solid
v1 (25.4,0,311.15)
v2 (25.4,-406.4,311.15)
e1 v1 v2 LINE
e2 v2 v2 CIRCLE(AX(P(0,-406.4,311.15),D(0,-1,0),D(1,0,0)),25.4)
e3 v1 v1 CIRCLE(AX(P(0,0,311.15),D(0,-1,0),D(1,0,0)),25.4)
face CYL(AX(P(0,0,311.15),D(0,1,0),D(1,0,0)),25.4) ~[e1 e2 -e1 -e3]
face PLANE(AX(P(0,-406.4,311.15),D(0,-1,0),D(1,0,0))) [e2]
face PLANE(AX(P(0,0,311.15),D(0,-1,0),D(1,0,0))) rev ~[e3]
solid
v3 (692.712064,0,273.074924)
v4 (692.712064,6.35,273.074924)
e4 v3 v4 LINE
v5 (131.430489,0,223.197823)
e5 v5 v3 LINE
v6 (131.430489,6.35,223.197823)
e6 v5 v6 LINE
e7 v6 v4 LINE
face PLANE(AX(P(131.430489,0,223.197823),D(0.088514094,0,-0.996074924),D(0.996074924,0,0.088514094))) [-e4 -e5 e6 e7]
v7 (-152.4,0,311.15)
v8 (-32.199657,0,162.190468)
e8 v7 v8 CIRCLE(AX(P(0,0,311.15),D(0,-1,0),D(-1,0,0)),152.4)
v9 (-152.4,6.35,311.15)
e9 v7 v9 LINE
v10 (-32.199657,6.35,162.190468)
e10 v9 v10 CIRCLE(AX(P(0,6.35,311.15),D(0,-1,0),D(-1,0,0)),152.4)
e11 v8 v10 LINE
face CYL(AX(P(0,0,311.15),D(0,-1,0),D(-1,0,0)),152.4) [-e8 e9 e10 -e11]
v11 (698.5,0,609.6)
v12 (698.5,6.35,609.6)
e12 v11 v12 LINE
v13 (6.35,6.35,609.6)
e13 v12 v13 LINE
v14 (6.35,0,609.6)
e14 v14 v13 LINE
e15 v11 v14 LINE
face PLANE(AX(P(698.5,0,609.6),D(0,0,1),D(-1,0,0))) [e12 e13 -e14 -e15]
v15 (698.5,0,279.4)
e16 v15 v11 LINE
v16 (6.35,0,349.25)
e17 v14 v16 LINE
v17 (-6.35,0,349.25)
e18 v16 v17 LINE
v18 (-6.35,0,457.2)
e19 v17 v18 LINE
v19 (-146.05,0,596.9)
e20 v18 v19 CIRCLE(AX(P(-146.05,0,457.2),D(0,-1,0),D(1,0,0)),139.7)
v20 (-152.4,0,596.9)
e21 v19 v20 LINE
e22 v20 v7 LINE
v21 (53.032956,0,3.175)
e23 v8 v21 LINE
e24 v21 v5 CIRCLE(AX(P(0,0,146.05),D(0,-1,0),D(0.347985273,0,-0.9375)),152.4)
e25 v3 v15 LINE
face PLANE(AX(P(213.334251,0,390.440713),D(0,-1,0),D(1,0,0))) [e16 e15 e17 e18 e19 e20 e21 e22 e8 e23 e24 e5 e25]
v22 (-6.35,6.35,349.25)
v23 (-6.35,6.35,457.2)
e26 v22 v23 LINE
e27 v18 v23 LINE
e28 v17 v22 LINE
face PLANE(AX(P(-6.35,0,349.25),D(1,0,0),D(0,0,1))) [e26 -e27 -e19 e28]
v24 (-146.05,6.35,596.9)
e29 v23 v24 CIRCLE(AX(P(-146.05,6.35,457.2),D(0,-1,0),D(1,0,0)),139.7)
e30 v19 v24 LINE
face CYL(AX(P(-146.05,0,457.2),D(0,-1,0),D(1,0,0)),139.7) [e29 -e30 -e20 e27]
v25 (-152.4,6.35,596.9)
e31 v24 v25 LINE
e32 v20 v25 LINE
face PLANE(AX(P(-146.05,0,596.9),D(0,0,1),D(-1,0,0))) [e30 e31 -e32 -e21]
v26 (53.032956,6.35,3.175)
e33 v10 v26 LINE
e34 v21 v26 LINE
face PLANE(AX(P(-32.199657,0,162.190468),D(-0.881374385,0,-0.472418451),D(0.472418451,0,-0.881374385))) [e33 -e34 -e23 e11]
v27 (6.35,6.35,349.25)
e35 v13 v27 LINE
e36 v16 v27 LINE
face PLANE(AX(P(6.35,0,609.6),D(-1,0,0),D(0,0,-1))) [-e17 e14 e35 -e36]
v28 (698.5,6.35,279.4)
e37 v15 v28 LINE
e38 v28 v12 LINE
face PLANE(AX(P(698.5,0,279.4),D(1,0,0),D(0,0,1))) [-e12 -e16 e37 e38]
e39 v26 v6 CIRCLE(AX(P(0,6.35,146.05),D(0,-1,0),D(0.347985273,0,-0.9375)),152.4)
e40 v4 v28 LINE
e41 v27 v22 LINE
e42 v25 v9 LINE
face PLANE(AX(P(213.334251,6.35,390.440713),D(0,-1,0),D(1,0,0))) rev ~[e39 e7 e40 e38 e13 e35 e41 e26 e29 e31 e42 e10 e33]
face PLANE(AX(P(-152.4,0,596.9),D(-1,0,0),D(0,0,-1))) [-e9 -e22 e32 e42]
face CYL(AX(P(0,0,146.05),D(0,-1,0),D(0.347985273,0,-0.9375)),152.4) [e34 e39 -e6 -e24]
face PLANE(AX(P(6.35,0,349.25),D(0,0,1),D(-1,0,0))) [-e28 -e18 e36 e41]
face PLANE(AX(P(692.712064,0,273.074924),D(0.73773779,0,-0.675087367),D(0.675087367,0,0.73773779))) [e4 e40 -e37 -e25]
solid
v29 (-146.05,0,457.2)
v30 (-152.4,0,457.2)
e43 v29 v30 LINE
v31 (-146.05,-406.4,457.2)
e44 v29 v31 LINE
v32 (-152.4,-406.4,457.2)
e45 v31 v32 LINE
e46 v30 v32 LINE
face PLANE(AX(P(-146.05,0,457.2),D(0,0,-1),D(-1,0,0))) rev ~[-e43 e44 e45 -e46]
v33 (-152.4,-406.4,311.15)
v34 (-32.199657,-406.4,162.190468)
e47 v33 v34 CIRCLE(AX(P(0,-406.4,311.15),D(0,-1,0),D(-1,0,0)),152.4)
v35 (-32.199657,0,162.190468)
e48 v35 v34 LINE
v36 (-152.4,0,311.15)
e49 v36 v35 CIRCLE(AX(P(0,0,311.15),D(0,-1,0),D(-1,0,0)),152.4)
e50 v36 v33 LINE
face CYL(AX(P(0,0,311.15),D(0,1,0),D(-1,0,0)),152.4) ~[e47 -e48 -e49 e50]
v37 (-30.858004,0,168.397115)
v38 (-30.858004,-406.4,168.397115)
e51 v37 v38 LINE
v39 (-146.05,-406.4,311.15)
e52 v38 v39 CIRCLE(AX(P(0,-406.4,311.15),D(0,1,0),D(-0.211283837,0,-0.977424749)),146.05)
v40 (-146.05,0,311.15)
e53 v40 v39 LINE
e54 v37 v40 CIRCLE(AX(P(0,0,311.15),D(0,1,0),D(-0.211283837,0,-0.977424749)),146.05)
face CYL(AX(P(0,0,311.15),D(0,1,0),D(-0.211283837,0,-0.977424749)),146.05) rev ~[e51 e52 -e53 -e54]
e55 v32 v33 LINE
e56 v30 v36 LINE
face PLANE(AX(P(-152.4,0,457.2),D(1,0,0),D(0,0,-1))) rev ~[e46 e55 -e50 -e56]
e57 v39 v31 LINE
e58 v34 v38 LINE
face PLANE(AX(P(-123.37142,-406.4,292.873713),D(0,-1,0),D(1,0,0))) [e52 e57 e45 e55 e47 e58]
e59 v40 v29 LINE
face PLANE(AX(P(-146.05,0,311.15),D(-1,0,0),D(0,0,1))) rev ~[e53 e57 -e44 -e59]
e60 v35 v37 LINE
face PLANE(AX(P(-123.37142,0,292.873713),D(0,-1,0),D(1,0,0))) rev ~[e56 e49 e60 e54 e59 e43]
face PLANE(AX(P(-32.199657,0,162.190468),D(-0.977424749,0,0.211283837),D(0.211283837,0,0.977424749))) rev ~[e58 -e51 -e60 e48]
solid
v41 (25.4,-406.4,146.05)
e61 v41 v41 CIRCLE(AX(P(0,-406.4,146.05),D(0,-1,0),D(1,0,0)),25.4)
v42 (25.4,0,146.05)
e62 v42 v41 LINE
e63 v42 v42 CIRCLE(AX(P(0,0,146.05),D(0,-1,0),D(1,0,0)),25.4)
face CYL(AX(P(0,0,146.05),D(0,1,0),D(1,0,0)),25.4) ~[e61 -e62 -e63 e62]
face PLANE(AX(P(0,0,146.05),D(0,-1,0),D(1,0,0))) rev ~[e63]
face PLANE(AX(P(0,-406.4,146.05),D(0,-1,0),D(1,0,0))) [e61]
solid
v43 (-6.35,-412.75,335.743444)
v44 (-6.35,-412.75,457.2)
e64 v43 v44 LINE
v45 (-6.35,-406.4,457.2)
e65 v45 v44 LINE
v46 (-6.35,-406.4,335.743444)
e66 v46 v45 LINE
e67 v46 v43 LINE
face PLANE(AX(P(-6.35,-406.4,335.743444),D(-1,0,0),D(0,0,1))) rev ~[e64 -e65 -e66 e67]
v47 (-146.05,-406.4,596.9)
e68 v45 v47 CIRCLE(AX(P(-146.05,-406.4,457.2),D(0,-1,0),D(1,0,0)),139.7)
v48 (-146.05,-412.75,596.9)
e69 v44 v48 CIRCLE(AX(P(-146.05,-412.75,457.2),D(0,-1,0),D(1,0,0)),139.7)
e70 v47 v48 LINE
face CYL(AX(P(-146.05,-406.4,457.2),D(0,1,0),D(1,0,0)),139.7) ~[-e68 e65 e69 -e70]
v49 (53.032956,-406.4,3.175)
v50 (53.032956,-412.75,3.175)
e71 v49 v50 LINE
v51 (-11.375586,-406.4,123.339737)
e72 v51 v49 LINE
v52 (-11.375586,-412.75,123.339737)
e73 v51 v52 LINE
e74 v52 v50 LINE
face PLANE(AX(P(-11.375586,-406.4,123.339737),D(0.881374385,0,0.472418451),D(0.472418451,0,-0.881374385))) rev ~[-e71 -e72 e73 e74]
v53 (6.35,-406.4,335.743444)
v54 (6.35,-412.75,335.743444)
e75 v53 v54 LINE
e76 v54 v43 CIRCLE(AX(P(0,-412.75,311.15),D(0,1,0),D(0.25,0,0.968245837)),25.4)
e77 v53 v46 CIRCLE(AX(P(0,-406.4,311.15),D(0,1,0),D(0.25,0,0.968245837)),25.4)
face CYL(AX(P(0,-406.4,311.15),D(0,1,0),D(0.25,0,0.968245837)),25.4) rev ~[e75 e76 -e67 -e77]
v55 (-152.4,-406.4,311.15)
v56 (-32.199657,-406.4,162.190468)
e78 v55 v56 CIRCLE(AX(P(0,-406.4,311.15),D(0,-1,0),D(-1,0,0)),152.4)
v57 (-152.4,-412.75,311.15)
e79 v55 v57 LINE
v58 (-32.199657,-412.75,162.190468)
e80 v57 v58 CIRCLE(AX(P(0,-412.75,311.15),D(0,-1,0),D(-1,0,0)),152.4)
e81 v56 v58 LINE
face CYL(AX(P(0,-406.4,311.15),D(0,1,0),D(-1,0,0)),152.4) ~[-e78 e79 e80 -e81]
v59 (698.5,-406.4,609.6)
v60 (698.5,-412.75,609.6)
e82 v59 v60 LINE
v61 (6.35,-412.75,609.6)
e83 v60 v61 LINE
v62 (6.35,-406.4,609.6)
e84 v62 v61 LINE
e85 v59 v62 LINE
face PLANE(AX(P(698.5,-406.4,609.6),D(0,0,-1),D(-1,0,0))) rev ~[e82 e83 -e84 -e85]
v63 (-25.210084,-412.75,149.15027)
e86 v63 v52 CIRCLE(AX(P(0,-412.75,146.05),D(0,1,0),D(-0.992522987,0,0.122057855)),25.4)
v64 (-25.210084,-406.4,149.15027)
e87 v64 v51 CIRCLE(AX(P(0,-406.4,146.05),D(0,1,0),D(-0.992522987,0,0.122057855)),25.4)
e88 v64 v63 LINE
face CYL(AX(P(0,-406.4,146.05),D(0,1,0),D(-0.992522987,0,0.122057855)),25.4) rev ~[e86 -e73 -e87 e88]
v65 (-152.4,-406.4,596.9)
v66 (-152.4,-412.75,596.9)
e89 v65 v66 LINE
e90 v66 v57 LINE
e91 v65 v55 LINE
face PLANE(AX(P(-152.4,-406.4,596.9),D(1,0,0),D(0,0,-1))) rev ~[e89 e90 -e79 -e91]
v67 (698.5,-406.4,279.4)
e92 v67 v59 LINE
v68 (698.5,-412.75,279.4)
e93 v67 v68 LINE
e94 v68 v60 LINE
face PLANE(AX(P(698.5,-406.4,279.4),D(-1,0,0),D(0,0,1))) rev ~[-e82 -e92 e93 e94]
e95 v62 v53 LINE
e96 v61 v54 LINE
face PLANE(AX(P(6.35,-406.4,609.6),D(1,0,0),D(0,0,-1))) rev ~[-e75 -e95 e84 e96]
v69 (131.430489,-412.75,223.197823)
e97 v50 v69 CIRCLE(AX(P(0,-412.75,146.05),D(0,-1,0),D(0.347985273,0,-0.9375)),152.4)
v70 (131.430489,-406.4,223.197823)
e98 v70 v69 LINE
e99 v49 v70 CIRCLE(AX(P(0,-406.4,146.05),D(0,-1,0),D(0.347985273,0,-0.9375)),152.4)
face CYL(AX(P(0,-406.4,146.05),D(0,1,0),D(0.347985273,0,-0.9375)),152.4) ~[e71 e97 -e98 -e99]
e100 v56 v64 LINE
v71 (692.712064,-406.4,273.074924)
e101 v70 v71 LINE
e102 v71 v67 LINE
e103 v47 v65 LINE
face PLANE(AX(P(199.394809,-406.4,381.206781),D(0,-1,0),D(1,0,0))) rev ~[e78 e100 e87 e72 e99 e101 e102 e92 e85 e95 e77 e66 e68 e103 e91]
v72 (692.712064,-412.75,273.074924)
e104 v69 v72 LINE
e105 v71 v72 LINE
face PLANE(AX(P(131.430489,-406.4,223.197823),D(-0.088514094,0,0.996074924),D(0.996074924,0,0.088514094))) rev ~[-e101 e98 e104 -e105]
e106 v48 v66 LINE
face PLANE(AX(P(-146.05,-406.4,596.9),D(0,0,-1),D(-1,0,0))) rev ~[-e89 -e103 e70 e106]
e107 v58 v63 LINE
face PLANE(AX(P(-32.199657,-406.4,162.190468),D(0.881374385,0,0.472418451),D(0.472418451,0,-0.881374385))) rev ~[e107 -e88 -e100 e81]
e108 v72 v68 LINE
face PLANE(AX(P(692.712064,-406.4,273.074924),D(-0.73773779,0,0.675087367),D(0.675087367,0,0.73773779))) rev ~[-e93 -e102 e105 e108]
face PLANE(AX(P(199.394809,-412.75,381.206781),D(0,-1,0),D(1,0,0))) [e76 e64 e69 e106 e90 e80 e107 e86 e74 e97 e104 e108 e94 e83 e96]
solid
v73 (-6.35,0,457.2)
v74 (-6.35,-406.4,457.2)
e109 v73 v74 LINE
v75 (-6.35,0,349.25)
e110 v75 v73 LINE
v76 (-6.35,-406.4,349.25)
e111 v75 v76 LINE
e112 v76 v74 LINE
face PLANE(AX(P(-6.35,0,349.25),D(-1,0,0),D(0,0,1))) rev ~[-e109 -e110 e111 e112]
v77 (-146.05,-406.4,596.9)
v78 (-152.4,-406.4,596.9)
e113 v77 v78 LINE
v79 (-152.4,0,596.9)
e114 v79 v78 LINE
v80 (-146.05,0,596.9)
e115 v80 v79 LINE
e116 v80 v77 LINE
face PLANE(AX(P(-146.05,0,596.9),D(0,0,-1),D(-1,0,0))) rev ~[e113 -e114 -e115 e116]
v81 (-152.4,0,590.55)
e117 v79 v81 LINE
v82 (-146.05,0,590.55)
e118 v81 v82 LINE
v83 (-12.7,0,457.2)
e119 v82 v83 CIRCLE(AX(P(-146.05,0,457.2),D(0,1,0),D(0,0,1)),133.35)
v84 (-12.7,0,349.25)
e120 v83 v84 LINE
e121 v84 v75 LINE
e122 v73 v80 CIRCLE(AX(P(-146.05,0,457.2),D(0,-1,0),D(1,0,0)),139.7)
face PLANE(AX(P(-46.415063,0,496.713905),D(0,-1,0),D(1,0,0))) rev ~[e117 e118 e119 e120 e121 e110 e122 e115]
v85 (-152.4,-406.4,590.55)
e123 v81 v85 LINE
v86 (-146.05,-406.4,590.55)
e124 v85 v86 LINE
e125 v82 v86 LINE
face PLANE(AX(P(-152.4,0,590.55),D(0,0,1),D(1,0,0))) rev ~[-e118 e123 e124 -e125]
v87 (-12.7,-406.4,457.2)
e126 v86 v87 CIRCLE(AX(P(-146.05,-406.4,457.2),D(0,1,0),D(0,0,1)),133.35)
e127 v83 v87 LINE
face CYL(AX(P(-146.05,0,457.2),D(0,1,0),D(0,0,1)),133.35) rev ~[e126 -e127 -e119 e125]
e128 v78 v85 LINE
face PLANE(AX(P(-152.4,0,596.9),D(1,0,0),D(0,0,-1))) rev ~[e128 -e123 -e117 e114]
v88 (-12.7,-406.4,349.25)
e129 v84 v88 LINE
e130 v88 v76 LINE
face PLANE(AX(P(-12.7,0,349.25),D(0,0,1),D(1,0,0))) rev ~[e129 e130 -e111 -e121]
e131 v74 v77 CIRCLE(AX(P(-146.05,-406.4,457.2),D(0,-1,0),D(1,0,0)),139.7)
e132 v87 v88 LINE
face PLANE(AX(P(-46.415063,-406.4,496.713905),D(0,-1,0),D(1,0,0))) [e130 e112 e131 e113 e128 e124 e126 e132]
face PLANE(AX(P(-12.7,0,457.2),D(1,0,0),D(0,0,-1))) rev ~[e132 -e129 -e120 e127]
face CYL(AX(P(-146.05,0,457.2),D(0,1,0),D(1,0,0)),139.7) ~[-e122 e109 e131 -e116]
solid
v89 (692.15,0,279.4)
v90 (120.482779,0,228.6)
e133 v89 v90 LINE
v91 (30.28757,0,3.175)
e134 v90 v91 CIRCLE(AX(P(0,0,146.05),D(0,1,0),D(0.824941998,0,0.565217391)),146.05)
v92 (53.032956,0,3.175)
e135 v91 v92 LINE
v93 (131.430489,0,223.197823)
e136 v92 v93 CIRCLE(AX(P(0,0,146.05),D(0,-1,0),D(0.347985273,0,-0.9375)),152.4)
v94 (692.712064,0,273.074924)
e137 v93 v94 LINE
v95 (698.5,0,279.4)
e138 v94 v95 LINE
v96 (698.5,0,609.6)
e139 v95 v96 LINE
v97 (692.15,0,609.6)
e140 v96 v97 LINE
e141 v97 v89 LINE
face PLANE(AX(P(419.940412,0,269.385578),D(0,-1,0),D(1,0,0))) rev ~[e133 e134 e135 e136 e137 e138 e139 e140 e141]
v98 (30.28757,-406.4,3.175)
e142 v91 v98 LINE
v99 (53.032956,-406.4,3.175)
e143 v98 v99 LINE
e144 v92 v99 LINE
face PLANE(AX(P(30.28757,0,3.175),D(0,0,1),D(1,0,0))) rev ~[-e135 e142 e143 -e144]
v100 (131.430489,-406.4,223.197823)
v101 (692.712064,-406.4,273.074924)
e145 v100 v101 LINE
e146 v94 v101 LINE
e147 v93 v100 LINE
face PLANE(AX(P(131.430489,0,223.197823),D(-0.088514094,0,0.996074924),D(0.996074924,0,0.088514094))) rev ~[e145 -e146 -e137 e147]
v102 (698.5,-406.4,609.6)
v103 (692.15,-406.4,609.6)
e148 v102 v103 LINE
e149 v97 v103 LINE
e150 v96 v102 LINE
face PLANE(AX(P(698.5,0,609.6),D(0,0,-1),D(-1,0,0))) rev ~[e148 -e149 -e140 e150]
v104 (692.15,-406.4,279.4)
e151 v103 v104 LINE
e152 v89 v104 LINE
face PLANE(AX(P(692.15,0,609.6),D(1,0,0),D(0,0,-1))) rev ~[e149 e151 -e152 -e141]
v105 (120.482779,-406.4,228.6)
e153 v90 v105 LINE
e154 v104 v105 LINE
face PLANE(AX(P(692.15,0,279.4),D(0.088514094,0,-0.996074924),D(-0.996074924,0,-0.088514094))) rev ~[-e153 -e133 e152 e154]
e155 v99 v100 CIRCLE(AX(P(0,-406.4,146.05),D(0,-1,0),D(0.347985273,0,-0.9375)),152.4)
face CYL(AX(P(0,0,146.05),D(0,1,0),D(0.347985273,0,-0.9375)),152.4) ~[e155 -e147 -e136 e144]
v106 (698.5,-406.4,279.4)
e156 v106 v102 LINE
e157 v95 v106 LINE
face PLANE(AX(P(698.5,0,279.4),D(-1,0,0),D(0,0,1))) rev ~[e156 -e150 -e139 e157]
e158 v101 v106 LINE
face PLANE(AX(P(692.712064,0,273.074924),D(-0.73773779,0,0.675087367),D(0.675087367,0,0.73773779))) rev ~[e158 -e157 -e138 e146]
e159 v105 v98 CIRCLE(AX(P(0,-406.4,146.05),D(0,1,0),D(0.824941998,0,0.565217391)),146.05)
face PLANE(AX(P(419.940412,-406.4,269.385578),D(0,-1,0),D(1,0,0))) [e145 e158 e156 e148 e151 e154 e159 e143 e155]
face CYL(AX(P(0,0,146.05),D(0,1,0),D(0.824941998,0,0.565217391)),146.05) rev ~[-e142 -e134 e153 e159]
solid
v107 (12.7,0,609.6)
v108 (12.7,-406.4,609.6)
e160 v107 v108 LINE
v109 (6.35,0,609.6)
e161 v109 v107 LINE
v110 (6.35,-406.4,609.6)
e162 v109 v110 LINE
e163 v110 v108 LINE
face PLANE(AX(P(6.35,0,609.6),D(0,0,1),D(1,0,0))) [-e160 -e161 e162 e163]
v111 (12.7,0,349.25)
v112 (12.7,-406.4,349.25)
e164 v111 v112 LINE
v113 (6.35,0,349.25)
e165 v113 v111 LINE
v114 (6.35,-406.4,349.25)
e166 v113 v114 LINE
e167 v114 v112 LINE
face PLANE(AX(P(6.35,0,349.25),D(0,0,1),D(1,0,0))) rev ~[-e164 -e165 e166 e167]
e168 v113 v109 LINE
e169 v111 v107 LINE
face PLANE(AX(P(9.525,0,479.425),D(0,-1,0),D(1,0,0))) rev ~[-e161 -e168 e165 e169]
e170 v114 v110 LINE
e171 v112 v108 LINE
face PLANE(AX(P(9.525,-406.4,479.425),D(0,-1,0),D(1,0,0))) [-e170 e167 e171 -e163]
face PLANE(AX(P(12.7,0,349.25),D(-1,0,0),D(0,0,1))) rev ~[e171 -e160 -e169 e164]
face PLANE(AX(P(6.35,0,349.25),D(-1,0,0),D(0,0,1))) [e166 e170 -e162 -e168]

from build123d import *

# Parameters (mm, degrees)
F0_R     = 25.4
F1_DEPTH = 406.4
F0_W     = 6.35
F0_H     = 260.35
F3_DEPTH = 6.35
F5_DEPTH = 6.35


# Not quite as in the source:
# - a feature names something its author has since deleted; it is built from what else it names


with BuildPart() as f1:
    # F0 (on Front) → F1 (new body)
    with BuildSketch(Plane.XZ):
        with Locations((0, 146.05)):
            Circle(F0_R)
    extrude(amount=F1_DEPTH)


with BuildPart() as f1b:
    # F0 (on Front) → F1, piece 2 (new body)
    with BuildSketch(Plane.XZ):
        with BuildLine():
            Line((-32.1996567388, 162.1904682274), (-30.8580043747, 168.3971153846))
            ThreePointArc((-30.8580043747, 168.3971153846), (-113.6604901426, 219.4336138929), (-146.05, 311.15))
            Line((-146.05, 311.15), (-146.05, 457.2))
            Line((-146.05, 457.2), (-152.4, 457.2))
            Line((-152.4, 457.2), (-152.4, 311.15))
            ThreePointArc((-152.4, 311.15), (-118.6022505836, 215.4459449318), (-32.1996567388, 162.1904682274))
        make_face()
    extrude(amount=F1_DEPTH)


with BuildPart() as f1c:
    # F0 (on Front) → F1, piece 3 (new body)
    with BuildSketch(Plane.XZ):
        with Locations((0, 311.15)):
            Circle(F0_R)
    extrude(amount=F1_DEPTH)


with BuildPart() as f1d:
    # F0 (on Front) → F1, piece 4 (new body)
    with BuildSketch(Plane.XZ):
        with BuildLine():
            ThreePointArc((120.4827788524, 228.6), (135.5987911183, 91.7953195822), (30.287569645, 3.175))
            Line((30.287569645, 3.175), (53.032955556, 3.175))
            ThreePointArc((53.032955556, 3.175), (143.559051356, 94.8976904357), (131.430489055, 223.1978226963))
            Line((131.430489055, 223.1978226963), (692.7120644971, 273.0749242296))
            Line((692.7120644971, 273.0749242296), (698.5, 279.4))
            Line((698.5, 279.4), (698.5, 609.6))
            Line((698.5, 609.6), (692.15, 609.6))
            Line((692.15, 609.6), (692.15, 279.4))
            Line((692.15, 279.4), (120.4827788524, 228.6))
        make_face()
    extrude(amount=F1_DEPTH)


with BuildPart() as f1e:
    # F0 (on Front) → F1, piece 5 (new body)
    with BuildSketch(Plane.XZ):
        with Locations((9.525, 479.425)):
            Rectangle(F0_W, F0_H)
    extrude(amount=F1_DEPTH)


with BuildPart() as f1f:
    # F0 (on Front) → F1, piece 6 (new body)
    with BuildSketch(Plane.XZ):
        with BuildLine():
            Line((-12.7, 457.2), (-12.7, 349.25))
            Line((-12.7, 349.25), (-6.35, 349.25))
            Line((-6.35, 349.25), (-6.35, 457.2))
            ThreePointArc((-6.35, 457.2), (-47.2671826682, 555.9828173318), (-146.05, 596.9))
            Line((-146.05, 596.9), (-152.4, 596.9))
            Line((-152.4, 596.9), (-152.4, 590.55))
            Line((-152.4, 590.55), (-146.05, 590.55))
            ThreePointArc((-146.05, 590.55), (-51.7573107288, 551.4926892712), (-12.7, 457.2))
        make_face()
    extrude(amount=F1_DEPTH)


with BuildPart() as f3:
    # F2 (on Front) → F3 (new body)
    with BuildSketch(Plane.XZ):
        with BuildLine():
            Line((692.7120644971, 273.0749242296), (698.5, 279.4))
            Line((698.5, 279.4), (698.5, 609.6))
            Line((698.5, 609.6), (692.15, 609.6))
            Line((692.15, 609.6), (6.35, 609.6))
            Line((6.35, 609.6), (6.35, 349.25))
            Line((6.35, 349.25), (-6.35, 349.25))
            Line((-6.35, 349.25), (-6.35, 457.2))
            ThreePointArc((-6.35, 457.2), (-47.2671826682, 555.9828173318), (-146.05, 596.9))
            Line((-146.05, 596.9), (-152.4, 596.9))
            Line((-152.4, 596.9), (-152.4, 457.2))
            Line((-152.4, 457.2), (-152.4, 311.15))
            ThreePointArc((-152.4, 311.15), (-118.6022505836, 215.4459449318), (-32.1996567388, 162.1904682274))
            Line((-32.1996567388, 162.1904682274), (53.032955556, 3.175))
            ThreePointArc((53.032955556, 3.175), (143.559051356, 94.8976904357), (131.430489055, 223.1978226963))
            Line((131.430489055, 223.1978226963), (692.7120644971, 273.0749242296))
        make_face()
    extrude(amount=-F3_DEPTH)


with BuildPart() as f5:
    # F4 (on face) → F5 (new body)
    with BuildSketch(Plane.XZ.offset(406.4)):
        with BuildLine():
            Line((-6.35, 349.25), (-6.35, 457.2))
            ThreePointArc((-6.35, 457.2), (-47.2671826682, 555.9828173318), (-146.05, 596.9))
            Line((-146.05, 596.9), (-152.4, 596.9))
            Line((-152.4, 596.9), (-152.4, 457.2))
            Line((-152.4, 457.2), (-152.4, 311.15))
            ThreePointArc((-152.4, 311.15), (-118.6022505836, 215.4459449318), (-32.1996567388, 162.1904682274))
            Line((-32.1996567388, 162.1904682274), (-25.2100838748, 149.1502695083))
            ThreePointArc((-25.2100838748, 149.1502695083), (1.5530404984, 171.4024765104), (25.4, 146.05))
            ThreePointArc((25.4, 146.05), (13.3457878073, 124.4386615916), (-11.3755864411, 123.3397372732))
            Line((-11.3755864411, 123.3397372732), (53.032955556, 3.175))
            ThreePointArc((53.032955556, 3.175), (143.559051356, 94.8976904357), (131.430489055, 223.1978226963))
            Line((131.430489055, 223.1978226963), (692.7120644971, 273.0749242296))
            Line((692.7120644971, 273.0749242296), (698.5, 279.4))
            Line((698.5, 279.4), (698.5, 609.6))
            Line((698.5, 609.6), (6.35, 609.6))
            Line((6.35, 609.6), (6.35, 349.25))
            Line((6.35, 349.25), (6.35, 335.7434442484))
            ThreePointArc((6.35, 335.7434442484), (0, 285.75), (-6.35, 335.7434442484))
            Line((-6.35, 335.7434442484), (-6.35, 349.25))
        make_face()
    extrude(amount=F5_DEPTH)


solid = Compound([f1.part, f1b.part, f1c.part, f1d.part, f1e.part, f1f.part, f3.part, f5.part])
